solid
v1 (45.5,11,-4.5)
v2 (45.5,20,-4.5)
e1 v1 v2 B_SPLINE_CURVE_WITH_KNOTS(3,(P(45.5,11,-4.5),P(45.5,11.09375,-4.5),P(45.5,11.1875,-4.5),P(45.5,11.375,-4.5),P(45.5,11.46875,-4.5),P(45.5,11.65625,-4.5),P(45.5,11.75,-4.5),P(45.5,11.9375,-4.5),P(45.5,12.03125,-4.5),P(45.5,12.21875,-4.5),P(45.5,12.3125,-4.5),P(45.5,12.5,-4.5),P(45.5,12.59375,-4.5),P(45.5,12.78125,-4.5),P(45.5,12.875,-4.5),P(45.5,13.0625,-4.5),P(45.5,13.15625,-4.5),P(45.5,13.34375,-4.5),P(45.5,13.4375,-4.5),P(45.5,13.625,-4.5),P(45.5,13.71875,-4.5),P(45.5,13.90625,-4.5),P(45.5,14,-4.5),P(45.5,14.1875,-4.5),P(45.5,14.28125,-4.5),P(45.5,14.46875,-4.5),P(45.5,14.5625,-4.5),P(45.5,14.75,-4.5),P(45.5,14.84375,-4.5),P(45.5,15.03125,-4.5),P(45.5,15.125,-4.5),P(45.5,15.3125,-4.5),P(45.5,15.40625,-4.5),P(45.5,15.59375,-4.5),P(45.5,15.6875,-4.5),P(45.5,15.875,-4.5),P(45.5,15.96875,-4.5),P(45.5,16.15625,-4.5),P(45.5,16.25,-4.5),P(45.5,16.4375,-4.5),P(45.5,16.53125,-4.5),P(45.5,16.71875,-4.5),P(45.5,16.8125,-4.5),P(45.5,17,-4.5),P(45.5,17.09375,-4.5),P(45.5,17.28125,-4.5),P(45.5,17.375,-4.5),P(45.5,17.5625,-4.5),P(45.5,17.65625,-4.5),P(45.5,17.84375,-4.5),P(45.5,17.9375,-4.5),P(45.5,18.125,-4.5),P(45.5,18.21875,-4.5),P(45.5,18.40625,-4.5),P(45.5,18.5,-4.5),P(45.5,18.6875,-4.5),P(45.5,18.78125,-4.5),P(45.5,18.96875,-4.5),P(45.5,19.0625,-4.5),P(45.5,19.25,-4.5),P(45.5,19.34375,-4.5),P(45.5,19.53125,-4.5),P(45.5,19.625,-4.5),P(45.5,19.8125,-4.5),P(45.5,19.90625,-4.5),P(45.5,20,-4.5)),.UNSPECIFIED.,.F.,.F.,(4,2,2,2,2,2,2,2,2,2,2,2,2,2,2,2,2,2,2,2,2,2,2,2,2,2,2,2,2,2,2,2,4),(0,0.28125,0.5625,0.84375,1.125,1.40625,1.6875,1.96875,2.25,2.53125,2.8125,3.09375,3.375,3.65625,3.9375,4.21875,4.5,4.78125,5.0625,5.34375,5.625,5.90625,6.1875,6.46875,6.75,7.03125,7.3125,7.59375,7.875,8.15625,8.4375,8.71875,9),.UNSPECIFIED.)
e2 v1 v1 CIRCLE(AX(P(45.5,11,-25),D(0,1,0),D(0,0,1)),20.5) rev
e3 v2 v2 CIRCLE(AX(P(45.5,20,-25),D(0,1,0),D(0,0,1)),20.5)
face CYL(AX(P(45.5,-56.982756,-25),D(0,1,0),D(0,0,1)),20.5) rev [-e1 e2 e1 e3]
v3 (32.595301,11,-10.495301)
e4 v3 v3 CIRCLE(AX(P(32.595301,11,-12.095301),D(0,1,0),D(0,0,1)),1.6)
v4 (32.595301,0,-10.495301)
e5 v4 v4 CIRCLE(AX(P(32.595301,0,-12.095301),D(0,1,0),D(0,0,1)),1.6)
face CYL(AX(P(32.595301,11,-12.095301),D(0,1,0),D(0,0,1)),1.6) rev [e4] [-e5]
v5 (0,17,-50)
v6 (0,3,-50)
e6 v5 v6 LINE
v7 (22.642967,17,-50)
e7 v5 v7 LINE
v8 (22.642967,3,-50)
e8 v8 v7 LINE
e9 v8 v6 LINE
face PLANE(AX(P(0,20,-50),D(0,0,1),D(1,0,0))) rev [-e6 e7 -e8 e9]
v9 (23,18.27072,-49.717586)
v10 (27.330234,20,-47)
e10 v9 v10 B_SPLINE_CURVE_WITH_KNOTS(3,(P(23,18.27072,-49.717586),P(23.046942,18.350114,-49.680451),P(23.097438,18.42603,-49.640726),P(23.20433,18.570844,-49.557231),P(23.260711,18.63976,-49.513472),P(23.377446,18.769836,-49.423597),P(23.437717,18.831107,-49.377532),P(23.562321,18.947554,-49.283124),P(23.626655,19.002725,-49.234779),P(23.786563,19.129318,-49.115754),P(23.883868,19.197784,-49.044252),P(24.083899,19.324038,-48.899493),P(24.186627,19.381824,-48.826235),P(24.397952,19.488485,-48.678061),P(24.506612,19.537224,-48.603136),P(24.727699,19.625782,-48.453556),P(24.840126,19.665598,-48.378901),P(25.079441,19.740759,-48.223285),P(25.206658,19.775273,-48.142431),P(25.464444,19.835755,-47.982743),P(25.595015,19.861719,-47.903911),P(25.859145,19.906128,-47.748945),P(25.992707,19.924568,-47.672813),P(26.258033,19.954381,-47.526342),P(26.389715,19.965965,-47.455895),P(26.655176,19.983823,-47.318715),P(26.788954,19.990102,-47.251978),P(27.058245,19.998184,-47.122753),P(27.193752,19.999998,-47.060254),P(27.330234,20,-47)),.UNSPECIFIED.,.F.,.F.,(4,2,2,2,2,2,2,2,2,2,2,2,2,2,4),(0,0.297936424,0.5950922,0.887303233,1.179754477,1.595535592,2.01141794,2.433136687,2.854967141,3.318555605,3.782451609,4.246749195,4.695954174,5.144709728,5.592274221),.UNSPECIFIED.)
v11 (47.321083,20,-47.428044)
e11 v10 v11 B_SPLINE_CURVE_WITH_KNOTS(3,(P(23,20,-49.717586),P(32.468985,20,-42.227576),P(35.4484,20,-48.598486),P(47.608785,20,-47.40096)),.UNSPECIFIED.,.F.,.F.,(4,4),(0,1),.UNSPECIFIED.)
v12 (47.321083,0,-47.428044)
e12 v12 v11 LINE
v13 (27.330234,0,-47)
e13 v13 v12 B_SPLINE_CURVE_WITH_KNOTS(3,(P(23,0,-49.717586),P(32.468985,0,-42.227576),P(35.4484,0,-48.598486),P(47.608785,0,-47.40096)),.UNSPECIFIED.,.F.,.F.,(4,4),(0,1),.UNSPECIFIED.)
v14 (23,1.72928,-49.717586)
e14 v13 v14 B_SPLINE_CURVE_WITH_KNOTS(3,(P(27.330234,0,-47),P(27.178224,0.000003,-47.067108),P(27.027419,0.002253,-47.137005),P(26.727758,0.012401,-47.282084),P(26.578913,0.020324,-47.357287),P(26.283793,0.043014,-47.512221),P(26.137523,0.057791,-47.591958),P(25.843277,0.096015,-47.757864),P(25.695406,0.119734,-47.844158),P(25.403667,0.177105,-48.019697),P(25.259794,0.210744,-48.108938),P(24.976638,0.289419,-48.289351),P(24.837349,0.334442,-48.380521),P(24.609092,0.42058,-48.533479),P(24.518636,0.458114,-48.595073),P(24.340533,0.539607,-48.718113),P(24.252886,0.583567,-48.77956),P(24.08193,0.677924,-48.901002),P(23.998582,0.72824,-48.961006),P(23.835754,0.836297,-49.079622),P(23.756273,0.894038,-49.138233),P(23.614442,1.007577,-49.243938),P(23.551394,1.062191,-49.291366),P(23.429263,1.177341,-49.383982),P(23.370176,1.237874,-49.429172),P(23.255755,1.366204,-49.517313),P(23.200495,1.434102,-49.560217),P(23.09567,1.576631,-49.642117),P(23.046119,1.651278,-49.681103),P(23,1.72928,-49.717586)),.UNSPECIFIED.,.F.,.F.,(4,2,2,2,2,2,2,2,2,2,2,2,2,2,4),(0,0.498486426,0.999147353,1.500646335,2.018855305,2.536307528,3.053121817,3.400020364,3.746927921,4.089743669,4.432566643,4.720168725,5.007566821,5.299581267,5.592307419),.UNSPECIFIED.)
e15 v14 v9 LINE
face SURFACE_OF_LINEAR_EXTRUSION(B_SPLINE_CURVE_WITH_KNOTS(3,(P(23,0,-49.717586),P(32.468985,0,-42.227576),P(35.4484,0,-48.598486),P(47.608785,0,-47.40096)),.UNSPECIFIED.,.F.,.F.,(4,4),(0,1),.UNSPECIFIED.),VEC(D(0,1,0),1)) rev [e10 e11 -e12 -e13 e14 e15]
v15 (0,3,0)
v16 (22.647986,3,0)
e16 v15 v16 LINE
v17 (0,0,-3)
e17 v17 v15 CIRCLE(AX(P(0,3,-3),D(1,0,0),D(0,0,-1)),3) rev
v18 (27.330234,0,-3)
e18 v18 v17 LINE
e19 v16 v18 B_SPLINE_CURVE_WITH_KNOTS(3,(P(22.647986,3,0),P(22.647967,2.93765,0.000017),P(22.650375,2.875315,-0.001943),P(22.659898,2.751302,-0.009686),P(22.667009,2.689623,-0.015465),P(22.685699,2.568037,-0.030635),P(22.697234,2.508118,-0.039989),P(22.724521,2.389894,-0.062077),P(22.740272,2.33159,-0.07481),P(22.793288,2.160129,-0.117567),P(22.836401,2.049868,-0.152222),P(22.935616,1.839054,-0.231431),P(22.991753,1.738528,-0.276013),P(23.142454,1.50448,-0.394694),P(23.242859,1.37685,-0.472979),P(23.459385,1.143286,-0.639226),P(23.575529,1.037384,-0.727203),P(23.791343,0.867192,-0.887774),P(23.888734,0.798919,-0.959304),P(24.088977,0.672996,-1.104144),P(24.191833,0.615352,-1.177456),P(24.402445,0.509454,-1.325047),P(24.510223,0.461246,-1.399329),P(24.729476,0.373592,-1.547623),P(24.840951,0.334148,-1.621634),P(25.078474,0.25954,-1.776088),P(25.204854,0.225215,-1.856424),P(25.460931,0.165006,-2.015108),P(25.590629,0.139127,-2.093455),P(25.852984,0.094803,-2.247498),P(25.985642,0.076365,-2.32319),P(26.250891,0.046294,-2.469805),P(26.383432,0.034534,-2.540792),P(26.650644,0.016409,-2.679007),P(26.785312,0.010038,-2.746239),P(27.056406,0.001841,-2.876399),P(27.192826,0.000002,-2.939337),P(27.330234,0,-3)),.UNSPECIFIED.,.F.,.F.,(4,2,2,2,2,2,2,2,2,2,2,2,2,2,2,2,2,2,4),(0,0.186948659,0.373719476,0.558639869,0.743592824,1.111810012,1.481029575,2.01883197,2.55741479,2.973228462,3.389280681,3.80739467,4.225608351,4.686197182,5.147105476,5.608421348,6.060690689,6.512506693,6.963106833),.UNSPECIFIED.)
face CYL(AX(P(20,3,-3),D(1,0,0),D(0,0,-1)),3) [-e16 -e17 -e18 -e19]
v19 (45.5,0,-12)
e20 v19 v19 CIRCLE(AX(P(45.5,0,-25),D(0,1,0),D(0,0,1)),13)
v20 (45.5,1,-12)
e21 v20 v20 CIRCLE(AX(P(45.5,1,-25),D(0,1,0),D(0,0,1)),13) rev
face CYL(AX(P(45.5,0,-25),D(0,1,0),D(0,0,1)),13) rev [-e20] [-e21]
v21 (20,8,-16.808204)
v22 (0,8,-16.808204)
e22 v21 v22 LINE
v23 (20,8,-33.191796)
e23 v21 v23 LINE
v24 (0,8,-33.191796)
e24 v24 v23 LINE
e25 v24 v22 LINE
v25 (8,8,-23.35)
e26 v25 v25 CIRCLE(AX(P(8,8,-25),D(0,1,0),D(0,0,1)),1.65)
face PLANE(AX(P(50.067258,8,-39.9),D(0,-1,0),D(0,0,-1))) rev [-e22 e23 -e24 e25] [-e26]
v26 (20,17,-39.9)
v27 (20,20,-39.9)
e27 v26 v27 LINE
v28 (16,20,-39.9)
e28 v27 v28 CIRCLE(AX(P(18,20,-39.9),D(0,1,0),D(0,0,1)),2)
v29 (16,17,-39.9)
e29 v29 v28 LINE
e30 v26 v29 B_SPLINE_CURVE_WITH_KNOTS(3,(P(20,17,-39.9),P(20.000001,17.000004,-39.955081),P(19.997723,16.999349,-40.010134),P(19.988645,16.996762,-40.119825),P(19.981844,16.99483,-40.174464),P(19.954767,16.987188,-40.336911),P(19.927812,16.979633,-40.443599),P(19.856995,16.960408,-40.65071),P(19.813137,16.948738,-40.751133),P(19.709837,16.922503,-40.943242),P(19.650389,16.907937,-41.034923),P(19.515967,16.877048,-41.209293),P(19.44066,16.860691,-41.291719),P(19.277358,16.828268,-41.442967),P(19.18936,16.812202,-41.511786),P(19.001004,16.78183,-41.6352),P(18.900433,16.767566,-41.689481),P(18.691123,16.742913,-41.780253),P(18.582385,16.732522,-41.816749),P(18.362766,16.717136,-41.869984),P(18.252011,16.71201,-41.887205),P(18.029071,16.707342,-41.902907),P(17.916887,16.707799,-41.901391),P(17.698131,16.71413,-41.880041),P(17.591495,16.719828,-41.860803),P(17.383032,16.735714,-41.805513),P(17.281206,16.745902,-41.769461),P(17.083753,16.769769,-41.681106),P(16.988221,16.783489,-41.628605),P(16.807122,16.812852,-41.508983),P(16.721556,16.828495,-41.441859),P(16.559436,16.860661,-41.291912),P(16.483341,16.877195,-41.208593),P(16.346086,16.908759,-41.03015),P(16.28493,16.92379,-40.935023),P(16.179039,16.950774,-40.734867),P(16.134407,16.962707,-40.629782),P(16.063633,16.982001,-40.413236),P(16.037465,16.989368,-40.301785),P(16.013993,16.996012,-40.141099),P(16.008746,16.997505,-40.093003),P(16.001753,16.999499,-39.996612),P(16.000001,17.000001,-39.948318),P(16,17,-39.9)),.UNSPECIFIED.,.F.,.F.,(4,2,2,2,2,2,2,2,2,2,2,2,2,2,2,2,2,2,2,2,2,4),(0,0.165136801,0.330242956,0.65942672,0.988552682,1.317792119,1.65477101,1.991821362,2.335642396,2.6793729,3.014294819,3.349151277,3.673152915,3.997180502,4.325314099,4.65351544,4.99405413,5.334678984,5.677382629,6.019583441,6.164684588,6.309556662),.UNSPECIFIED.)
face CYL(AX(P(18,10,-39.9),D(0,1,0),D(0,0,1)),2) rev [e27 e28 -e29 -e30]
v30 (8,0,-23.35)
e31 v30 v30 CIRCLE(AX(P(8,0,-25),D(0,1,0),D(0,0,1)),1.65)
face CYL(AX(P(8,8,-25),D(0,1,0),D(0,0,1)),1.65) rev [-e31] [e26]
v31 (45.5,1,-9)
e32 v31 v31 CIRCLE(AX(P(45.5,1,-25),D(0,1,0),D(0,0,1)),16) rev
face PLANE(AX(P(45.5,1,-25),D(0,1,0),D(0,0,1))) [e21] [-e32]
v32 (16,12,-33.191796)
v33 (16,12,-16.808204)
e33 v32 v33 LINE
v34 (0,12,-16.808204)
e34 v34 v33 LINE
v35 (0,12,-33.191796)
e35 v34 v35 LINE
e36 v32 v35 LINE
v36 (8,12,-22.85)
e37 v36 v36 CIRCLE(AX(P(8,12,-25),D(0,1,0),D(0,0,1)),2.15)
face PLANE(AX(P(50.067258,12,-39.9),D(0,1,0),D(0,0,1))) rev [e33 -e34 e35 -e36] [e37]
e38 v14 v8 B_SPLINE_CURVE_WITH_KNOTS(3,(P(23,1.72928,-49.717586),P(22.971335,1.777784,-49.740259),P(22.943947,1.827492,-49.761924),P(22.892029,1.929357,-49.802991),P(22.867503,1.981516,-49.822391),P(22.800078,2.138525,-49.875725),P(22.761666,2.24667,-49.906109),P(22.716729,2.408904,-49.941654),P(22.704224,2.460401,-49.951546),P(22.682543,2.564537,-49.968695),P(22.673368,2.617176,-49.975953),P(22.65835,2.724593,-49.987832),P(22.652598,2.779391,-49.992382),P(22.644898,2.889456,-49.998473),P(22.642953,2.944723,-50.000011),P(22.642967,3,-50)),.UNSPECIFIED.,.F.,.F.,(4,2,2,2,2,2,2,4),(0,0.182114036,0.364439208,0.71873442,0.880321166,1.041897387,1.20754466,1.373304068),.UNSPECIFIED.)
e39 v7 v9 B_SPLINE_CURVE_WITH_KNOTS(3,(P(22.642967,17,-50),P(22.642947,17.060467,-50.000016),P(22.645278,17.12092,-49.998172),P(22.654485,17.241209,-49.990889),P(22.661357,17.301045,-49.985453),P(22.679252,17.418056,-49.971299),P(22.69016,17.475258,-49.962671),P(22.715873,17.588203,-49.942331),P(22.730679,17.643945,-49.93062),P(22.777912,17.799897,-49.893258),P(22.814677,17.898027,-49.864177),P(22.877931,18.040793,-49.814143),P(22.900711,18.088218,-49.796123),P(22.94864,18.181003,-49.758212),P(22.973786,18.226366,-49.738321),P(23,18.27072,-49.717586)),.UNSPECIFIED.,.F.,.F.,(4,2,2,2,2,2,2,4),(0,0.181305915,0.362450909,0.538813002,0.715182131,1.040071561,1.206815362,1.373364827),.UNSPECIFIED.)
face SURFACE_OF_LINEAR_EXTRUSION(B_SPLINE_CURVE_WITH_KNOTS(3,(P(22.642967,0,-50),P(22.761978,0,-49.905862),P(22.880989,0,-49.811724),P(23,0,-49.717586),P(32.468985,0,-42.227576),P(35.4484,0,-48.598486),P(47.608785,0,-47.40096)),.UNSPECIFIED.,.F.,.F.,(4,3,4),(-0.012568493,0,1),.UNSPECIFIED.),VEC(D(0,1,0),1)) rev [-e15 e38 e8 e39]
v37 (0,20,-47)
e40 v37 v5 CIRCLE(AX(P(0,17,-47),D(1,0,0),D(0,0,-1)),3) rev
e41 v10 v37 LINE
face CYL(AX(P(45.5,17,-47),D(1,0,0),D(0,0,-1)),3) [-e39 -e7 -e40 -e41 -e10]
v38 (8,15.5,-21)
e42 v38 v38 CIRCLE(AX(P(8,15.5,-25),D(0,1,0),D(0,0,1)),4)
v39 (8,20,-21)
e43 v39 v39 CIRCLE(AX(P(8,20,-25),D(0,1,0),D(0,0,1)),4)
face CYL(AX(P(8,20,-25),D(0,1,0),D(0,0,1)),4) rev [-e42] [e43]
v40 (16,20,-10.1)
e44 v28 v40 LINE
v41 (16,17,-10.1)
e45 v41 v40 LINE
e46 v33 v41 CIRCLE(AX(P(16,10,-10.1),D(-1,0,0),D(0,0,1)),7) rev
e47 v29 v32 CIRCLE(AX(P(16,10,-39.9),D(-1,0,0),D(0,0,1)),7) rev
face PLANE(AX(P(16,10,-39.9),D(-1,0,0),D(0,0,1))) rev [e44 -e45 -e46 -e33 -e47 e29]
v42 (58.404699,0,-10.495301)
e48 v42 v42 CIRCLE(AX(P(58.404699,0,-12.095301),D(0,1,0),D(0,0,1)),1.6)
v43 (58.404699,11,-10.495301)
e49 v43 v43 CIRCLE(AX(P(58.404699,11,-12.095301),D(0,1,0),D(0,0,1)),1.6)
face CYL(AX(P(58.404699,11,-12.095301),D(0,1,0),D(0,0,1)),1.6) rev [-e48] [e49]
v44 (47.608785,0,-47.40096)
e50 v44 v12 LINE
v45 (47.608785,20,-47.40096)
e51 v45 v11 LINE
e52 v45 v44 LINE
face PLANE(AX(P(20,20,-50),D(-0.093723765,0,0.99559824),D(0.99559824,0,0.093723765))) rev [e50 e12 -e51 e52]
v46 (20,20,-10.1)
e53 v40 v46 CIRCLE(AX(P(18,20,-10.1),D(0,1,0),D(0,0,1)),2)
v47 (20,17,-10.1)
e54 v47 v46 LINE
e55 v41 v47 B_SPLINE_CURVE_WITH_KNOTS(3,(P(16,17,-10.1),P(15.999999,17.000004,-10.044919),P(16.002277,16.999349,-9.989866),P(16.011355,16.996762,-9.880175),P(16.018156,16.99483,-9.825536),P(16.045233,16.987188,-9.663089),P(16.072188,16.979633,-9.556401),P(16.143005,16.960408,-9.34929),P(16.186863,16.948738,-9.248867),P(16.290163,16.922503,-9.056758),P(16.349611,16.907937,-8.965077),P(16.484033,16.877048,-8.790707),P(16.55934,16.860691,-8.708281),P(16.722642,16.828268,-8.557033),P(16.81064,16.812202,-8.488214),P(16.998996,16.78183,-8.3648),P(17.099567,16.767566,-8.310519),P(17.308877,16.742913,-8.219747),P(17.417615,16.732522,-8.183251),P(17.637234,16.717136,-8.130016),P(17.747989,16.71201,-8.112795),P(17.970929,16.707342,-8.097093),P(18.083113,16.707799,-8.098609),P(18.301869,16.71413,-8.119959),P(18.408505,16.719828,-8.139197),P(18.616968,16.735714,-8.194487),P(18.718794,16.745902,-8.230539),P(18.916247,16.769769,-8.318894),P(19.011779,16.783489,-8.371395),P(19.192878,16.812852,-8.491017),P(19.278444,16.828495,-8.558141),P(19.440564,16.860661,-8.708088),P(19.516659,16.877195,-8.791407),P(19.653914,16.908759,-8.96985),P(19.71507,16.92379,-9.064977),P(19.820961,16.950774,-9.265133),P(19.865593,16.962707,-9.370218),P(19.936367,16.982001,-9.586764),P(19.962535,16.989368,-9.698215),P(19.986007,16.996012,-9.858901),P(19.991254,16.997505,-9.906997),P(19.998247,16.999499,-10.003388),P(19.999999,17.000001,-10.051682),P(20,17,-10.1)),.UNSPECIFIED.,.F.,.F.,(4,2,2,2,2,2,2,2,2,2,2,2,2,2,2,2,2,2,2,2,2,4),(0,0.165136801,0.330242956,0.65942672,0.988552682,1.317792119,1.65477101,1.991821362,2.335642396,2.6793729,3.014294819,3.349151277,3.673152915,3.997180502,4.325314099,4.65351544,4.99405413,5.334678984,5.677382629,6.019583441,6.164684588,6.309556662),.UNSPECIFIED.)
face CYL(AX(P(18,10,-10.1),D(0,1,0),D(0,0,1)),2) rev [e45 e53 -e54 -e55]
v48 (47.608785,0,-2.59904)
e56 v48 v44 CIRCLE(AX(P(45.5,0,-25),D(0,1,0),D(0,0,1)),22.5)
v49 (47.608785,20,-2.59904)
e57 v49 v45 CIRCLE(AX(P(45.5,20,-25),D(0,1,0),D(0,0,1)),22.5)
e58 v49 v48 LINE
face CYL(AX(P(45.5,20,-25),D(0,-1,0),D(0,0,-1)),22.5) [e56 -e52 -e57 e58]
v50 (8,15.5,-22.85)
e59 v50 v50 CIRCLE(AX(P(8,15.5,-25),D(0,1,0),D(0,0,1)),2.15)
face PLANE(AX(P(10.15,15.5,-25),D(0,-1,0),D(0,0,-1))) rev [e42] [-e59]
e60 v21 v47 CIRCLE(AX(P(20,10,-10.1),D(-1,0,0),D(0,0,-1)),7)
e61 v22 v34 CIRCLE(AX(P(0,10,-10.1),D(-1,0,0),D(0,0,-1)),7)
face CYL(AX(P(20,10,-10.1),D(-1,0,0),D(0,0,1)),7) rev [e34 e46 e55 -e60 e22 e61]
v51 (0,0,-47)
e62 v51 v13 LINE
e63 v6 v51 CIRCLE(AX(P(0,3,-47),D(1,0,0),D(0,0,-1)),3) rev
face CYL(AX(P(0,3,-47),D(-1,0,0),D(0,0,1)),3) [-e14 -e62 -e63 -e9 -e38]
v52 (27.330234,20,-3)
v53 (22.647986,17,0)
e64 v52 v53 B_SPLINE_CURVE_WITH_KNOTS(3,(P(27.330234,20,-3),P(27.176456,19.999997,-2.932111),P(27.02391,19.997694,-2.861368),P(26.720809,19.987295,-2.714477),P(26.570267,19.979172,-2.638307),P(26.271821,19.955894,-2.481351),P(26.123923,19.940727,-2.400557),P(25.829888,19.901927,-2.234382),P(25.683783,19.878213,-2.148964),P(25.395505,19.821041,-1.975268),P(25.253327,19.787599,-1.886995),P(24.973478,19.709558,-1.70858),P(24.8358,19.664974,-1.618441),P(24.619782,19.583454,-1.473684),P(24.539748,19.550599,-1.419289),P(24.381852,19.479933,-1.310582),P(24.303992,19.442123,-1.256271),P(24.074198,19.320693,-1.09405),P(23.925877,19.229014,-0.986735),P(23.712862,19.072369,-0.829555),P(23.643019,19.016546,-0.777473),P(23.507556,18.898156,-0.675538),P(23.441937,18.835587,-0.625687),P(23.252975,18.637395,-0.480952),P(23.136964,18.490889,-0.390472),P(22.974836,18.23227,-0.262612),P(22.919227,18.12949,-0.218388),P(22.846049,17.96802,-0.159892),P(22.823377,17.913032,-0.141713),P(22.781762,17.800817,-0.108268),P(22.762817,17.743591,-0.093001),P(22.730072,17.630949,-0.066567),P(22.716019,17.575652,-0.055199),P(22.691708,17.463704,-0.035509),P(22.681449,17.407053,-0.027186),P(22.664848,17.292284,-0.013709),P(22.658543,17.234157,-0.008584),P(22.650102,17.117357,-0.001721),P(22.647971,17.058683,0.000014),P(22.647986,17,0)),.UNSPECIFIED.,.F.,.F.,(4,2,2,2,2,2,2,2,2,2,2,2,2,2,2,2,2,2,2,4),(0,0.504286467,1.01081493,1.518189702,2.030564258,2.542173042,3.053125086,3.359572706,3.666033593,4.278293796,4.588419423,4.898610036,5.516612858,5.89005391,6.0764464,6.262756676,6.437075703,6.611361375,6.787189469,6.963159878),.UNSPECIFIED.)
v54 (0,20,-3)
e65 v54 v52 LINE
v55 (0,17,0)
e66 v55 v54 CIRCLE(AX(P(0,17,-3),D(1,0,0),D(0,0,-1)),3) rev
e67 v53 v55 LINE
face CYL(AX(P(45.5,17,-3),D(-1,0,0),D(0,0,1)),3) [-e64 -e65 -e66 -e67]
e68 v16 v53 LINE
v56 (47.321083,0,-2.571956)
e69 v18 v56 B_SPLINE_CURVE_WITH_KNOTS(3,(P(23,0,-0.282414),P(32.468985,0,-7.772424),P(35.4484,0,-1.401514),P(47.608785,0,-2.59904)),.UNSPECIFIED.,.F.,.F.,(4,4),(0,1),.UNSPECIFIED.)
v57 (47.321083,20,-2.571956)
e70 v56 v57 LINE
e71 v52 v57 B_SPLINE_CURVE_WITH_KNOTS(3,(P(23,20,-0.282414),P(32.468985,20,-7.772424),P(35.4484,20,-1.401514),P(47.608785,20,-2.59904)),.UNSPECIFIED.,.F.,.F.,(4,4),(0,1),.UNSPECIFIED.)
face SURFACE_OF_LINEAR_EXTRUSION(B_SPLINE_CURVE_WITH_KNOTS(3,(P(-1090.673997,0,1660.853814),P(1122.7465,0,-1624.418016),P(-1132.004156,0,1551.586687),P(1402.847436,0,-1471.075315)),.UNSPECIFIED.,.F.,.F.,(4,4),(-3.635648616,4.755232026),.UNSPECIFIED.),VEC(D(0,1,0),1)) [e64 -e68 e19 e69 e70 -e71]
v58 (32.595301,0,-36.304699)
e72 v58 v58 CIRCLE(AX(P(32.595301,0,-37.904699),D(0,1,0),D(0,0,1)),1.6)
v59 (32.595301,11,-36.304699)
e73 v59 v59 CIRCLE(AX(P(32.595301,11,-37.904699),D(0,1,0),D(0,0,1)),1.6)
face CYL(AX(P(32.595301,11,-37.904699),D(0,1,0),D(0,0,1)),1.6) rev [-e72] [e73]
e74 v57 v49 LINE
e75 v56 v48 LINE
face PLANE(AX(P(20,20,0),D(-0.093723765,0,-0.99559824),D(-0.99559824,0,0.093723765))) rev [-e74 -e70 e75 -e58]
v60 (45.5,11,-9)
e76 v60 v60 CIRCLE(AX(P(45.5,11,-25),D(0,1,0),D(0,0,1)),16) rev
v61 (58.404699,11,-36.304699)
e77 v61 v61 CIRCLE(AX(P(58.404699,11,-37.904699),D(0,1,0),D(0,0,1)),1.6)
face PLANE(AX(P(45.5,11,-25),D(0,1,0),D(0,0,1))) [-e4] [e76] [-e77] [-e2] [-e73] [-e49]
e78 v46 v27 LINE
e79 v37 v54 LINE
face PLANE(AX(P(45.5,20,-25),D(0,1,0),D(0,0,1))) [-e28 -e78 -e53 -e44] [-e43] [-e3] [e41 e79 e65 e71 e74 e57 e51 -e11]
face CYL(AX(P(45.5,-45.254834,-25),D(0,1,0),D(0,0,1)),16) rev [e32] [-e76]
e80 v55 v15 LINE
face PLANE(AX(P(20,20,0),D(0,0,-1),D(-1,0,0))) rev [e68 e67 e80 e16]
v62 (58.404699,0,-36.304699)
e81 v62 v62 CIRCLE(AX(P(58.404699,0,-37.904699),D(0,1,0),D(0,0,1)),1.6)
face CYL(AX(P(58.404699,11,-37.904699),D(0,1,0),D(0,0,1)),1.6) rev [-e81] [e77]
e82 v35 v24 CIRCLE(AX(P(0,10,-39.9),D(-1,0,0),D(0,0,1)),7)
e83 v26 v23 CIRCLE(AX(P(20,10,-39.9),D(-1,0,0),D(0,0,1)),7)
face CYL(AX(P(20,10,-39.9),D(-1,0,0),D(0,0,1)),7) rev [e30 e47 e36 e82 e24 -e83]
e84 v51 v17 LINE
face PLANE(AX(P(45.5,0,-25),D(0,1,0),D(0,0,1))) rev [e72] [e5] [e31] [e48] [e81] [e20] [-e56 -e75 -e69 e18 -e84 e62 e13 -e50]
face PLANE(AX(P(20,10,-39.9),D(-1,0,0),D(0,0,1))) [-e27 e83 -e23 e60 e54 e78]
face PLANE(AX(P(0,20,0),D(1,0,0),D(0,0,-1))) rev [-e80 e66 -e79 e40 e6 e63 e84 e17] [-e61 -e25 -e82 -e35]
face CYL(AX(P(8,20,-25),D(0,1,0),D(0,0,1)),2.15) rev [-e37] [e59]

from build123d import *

# Parameters (mm, degrees)
EXTRUDE_1_DEPTH             = 20
SKETCH_2_R                  = 7
CUT_EXTRUDE_1_DEPTH         = 20
SKETCH_3_R                  = 13
CUT_EXTRUDE_2_DEPTH         = 87.740993769
SKETCH_4_R                  = 16
CUT_EXTRUDE_3_DEPTH         = 19
CUT_EXTRUDE_9_DEPTH         = 87.740993769
EXTRUDE_START               = -20
EXTRUDE_4_DEPTH             = 20
FILLET_2_R                  = 3
SKETCH_7_R                  = 20.5
CUT_EXTRUDE_10_DEPTH        = 9
SKETCH_8_W                  = 29.8
SKETCH_8_H                  = 4
CUT_EXTRUDE_11_DEPTH        = 20
CUT_EXTRUDE_12_DEPTH        = 10
HOLE_WIZARD_M41_D           = 4.3
HOLE_WIZARD_M41_DEPTH       = 8
HOLE_WIZARD_M41_CBORE_D     = 8
HOLE_WIZARD_M41_CBORE_DEPTH = 4.5
M4X0_71_D                   = 3.3
HOLE_WIZARD_M31_D           = 3.2


# Read off the part's stored shape, not the designer's step: Бобышка-Вытянуть4
with BuildPart() as part:
    # Эскиз1 → Бобышка-Вытянуть1 (new body)
    with BuildSketch(Plane(origin=(0, 0, 0), x_dir=(1, 0, 0), z_dir=(0, 1, 0))):
        with BuildLine():
            Line((0, 0), (0, 50))
            Line((0, 50), (20, 50))
            Line((20, 50), (47.60878471, 47.400960405))
            ThreePointArc((47.60878471, 47.400960405), (68, 25), (47.60878471, 2.599039595))
            Line((47.60878471, 2.599039595), (20, 0))
            Line((20, 0), (0, 0))
        make_face()
    extrude(amount=EXTRUDE_1_DEPTH)

    # Эскиз2 → Вырез-Вытянуть1 (cut)
    with BuildSketch(Plane.ZY):
        with Locations((-39.9, 10)):
            Circle(SKETCH_2_R)
        with Locations(Location((-10.1, 10, 0), (0, 0, 180))):
            Circle(SKETCH_2_R)
    extrude(amount=-CUT_EXTRUDE_1_DEPTH, mode=Mode.SUBTRACT)

    # Эскиз3 → Вырез-Вытянуть2 (cut, through all)
    with BuildSketch(Plane(origin=(0, 20, 0), x_dir=(1, 0, 0), z_dir=(0, 1, 0))):
        with Locations(Location((45.5, 25, 0), (0, 0, 270))):
            Circle(SKETCH_3_R)
    extrude(amount=-CUT_EXTRUDE_2_DEPTH, mode=Mode.SUBTRACT)

    # Эскиз4 → Вырез-Вытянуть3 (cut)
    with BuildSketch(Plane(origin=(0, 20, 0), x_dir=(1, 0, 0), z_dir=(0, 1, 0))):
        with Locations(Location((45.5, 25, 0), (0, 0, 270))):
            Circle(SKETCH_4_R)
    extrude(amount=-CUT_EXTRUDE_3_DEPTH, mode=Mode.SUBTRACT)

    # Эскиз5 → Вырез-Вытянуть9 (cut, through all)
    with BuildSketch(Plane(origin=(0, 20, 0), x_dir=(1, 0, 0), z_dir=(0, 1, 0))):
        with BuildLine():
            add(Edge.make_bspline(
                [(47.32108314, 47.428044097), (47.41641101, 47.41948544), (47.512308925, 47.410461109), (47.60878471, 47.400960405)],
                knots=[0.992066387, 0.992066387, 0.992066387, 0.992066387, 1, 1, 1, 1], degree=3))
            Line((47.32108314, 47.428044095), (47.60878471, 47.400960405))
        make_face()
        with BuildLine():
            Line((47.32108314, 47.428044097), (23, 49.717585585))
            add(Edge.make_bspline(
                [(23, 49.717585585), (32.393861284, 42.286998451), (35.400716473, 48.498269788), (47.32108314, 47.428044097)],
                knots=[0, 0, 0, 0, 0.992066387, 0.992066387, 0.992066387, 0.992066387], degree=3))
        make_face()
        with BuildLine():
            add(Edge.make_bspline(
                [(23, 0.282414415), (32.393861284, 7.713001549), (35.400716473, 1.501730212), (47.32108314, 2.571955903)],
                knots=[0, 0, 0, 0, 0.992066387, 0.992066387, 0.992066387, 0.992066387], degree=3))
            Line((23, 0.282414415), (47.32108314, 2.571955903))
        make_face()
        with BuildLine():
            Line((47.60878471, 2.599039595), (47.32108314, 2.571955905))
            add(Edge.make_bspline(
                [(47.32108314, 2.571955903), (47.41641101, 2.58051456), (47.512308925, 2.589538891), (47.60878471, 2.599039595)],
                knots=[0.992066387, 0.992066387, 0.992066387, 0.992066387, 1, 1, 1, 1], degree=3))
        make_face()
    extrude(amount=-CUT_EXTRUDE_9_DEPTH, mode=Mode.SUBTRACT)

    # Бобышка-Вытянуть4 outline → Бобышка-Вытянуть4 (add)
    with BuildSketch(Plane(origin=(0, 20, 0), x_dir=(1, 0, 0), z_dir=(0, 1, 0)).offset(EXTRUDE_START)):
        with BuildLine():
            add(Edge.make_bspline(
                [(22.6429674, 50), (22.761978267, 49.905861862), (22.880989133, 49.811723723), (23, 49.717585585)],
                knots=[-0.012568493, -0.012568493, -0.012568493, -0.012568493, 0, 0, 0, 0], degree=3))
            Line((22.6429674, 50), (20, 50))
            Line((20, 50), (23, 49.717585585))
        make_face()
        with BuildLine():
            Line((20, 0), (22.6479861, 0))
            add(Edge.make_bspline(
                [(22.6479861, 0), (22.766323231, 0.09625734), (22.883651508, 0.190382227), (23, 0.282414415)],
                knots=[-0.012287325, -0.012287325, -0.012287325, -0.012287325, 0, 0, 0, 0], degree=3))
            Line((23, 0.282414415), (20, 0))
        make_face()
    extrude(amount=EXTRUDE_4_DEPTH)

    # Скругление2
    fillet_2_edges = [part.edges().sort_by_distance(p)[0] for p in [
        (11.32399305, 0, 0),
        (11.32399305, 20, 0),
        (11.3214837, 0, -50),
        (11.3214837, 20, -50),
    ]]
    fillet(fillet_2_edges, radius=FILLET_2_R)

    # Эскиз7 → Вырез-Вытянуть10 (cut)
    with BuildSketch(Plane(origin=(0, 20, 0), x_dir=(1, 0, 0), z_dir=(0, 1, 0))):
        with Locations(Location((45.5, 25, 0), (0, 0, 270))):
            Circle(SKETCH_7_R)
    extrude(amount=-CUT_EXTRUDE_10_DEPTH, mode=Mode.SUBTRACT)

    # Эскиз8 → Вырез-Вытянуть11 (cut)
    with BuildSketch(Plane.ZY):
        with Locations((-25, 10)):
            Rectangle(SKETCH_8_W, SKETCH_8_H)
    extrude(amount=-CUT_EXTRUDE_11_DEPTH, mode=Mode.SUBTRACT)

    # Эскиз9 → Вырез-Вытянуть12 (cut)
    with BuildSketch(Plane(origin=(0, 20, 0), x_dir=(1, 0, 0), z_dir=(0, 1, 0))):
        with BuildLine():
            Line((20, 39.9), (20, 10.1))
            ThreePointArc((20, 10.1), (18, 8.1), (16, 10.1))
            Line((16, 10.1), (16, 39.9))
            ThreePointArc((16, 39.9), (18, 41.9), (20, 39.9))
        make_face()
    extrude(amount=-CUT_EXTRUDE_12_DEPTH, mode=Mode.SUBTRACT)

    # Цековка для винта с внутренним шестигранником M41
    with Locations(Plane(origin=(0, 20, 0), x_dir=(1, 0, 0), z_dir=(0, 1, 0))):
        with Locations((8, 25)):
            CounterBoreHole(HOLE_WIZARD_M41_D / 2, HOLE_WIZARD_M41_CBORE_D / 2, HOLE_WIZARD_M41_CBORE_DEPTH, depth=HOLE_WIZARD_M41_DEPTH)

    # Отверстие обработанное метчиком M4x0.71 (through all)
    with Locations(Plane(origin=(0, 8, 0), x_dir=(1, 0, 0), z_dir=(0, 1, 0))):
        with Locations((8, 25)):
            Hole(M4X0_71_D / 2)

    # Отверстие с зазором M31 (through all)
    with Locations(Plane(origin=(0, 11, 0), x_dir=(1, 0, 0), z_dir=(0, 1, 0))):
        with Locations((32.595301243, 37.904698757), (58.404698757, 37.904698757), (58.404698757, 12.095301243), (32.595301243, 12.095301243)):
            Hole(HOLE_WIZARD_M31_D / 2)


solid = part.part
